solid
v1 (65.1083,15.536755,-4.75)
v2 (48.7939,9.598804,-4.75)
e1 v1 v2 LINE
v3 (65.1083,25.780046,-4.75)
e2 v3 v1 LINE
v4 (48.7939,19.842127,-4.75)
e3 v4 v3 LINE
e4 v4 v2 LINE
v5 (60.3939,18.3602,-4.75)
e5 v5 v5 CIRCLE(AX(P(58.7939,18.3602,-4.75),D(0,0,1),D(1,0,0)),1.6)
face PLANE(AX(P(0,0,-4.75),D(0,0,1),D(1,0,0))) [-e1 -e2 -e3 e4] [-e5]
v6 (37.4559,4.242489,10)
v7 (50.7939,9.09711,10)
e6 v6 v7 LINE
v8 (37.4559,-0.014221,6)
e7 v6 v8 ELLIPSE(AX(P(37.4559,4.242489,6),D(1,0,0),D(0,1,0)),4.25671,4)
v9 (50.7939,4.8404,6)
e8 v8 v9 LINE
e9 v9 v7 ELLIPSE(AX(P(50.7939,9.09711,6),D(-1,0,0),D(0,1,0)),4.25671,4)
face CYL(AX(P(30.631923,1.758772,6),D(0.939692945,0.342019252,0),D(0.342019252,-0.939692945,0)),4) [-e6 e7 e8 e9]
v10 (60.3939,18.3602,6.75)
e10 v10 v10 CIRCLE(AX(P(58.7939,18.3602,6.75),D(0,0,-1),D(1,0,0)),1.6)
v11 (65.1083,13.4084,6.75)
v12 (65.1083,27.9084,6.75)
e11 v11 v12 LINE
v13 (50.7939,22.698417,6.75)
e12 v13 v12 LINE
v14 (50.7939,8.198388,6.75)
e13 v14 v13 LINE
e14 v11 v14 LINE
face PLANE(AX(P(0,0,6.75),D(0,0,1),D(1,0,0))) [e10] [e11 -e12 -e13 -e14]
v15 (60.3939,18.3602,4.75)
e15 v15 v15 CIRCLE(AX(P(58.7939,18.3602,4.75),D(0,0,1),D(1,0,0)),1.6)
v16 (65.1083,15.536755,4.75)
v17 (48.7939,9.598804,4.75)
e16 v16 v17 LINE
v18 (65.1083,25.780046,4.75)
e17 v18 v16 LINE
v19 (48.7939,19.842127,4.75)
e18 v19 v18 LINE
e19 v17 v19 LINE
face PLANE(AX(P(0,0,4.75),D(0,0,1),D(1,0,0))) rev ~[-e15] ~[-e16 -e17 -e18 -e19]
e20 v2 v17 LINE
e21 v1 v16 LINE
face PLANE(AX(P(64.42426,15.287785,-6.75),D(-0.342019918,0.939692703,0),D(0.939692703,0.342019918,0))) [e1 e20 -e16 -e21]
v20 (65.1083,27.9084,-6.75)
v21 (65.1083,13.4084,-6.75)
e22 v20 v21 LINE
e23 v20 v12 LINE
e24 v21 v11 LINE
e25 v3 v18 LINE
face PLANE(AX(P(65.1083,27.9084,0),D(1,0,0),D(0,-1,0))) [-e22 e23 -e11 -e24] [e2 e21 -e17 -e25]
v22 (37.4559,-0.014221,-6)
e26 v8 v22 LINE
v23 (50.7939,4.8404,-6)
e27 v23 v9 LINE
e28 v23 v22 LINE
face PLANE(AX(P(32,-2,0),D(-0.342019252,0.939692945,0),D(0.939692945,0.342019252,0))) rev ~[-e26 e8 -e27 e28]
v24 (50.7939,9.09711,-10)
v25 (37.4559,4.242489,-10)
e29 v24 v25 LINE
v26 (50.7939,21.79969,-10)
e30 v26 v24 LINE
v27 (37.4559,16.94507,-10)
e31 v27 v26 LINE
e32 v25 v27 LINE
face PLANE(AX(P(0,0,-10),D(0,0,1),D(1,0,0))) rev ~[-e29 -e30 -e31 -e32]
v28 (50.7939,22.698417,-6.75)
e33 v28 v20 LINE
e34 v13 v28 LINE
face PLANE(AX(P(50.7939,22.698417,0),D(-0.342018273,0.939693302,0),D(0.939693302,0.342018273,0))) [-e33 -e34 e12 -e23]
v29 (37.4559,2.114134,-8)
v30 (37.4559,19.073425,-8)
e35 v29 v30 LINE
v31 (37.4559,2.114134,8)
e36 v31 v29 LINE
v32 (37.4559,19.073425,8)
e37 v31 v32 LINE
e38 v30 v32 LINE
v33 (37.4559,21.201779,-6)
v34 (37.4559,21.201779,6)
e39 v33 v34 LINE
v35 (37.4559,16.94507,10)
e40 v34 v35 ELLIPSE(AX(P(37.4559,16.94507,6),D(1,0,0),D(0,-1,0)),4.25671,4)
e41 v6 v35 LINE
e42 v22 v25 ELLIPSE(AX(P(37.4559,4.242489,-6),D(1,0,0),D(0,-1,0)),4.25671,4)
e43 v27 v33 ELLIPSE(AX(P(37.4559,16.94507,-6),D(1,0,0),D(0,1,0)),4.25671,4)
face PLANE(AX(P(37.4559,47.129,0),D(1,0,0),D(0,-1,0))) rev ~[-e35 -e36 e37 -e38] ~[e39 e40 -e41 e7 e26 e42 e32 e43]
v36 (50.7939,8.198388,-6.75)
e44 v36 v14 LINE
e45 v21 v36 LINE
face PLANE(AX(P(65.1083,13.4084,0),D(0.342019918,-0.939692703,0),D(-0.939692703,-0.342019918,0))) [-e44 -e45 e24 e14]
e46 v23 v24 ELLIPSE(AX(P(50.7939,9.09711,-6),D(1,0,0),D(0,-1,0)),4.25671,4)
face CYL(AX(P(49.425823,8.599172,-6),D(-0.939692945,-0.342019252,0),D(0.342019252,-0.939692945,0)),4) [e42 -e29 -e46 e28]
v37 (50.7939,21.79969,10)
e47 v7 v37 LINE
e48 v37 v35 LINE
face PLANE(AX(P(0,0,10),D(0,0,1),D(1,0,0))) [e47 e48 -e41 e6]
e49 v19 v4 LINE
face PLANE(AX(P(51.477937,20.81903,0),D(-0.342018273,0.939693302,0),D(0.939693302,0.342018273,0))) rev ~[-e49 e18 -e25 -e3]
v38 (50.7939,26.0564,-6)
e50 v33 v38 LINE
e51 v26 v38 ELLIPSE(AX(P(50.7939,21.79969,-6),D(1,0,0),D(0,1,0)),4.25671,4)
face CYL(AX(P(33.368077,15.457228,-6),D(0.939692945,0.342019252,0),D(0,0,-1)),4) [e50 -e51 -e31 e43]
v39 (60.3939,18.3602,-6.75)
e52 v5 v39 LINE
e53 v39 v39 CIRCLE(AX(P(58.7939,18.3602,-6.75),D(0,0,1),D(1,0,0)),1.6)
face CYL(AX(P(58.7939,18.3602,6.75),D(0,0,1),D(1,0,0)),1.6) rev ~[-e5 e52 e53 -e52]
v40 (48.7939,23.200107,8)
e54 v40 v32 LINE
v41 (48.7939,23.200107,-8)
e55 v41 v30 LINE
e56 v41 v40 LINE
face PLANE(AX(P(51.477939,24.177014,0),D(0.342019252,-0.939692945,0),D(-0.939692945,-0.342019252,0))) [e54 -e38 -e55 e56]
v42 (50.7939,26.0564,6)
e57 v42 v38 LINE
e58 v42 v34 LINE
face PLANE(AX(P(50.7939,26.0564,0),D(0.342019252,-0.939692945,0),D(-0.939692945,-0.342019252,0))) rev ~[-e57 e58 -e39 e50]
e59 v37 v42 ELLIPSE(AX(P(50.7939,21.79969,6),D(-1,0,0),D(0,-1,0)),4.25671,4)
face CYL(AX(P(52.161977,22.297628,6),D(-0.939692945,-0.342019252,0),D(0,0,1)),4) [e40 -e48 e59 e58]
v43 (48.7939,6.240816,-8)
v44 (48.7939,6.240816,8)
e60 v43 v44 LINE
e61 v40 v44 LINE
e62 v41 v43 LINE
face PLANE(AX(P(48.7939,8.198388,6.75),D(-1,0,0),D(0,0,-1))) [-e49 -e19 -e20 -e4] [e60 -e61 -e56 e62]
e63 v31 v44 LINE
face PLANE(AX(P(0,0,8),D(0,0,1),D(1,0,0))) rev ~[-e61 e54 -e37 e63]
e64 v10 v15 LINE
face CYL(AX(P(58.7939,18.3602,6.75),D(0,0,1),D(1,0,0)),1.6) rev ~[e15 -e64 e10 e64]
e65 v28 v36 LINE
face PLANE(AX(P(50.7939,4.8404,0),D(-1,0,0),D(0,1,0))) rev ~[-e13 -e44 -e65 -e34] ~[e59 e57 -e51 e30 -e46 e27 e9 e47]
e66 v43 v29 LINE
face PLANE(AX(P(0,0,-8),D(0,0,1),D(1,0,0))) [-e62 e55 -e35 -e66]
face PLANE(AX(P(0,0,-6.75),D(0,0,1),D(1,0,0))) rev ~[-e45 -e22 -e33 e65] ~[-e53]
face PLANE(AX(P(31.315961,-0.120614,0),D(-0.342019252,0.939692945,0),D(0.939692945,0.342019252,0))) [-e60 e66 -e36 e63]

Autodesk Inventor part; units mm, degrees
ref_plane "YZ Plane" through (0, 0, 0) normal (1, 0, 0) x (0, 1, 0)
ref_plane "XZ Plane" through (0, 0, 0) normal (0, 1, 0) x (-1, 0, 0)
ref_plane "XY Plane" through (0, 0, 0) normal (0, 0, 1) x (1, 0, 0)
sketch "Skizze1" plane through (0, 0, 0) normal (0, 1, 0) x (-1, 0, 0)
  line L0 (20.5, -10.1) -> (-20.5, -10.1)
  line L1 (-20.5, -10.1) -> (-20.5, 10.1)
  line L2 (-20.5, 10.1) -> (20.5, 10.1)
  line L3 (20.5, 10.1) -> (20.5, -10.1)
  line L4 (0, -23.94) -> (0, 23.94) projected
  line L5 (-40.6, 0) -> (40.6, 0) projected
  line L6 (29, -17.1) -> (-29, -17.1)
  line L7 (-29, -17.1) -> (-29, 17.1)
  line L8 (-29, 17.1) -> (29, 17.1)
  line L9 (29, 17.1) -> (29, -17.1)
  point P0 (0, 0)
  dimension "d0" = 41
  dimension "d3" = 20.2
  dimension "d7" = 58
  dimension "d8" = 7
extrude "Extrusion2" add sketch "Skizze1" along normal mid plane 4 contours L3 L5 L9 L6 L4 L0 | L4 L6 L7 L5 L1 L0 | L3 L2 L4 L8 L9 L5 | L5 L7 L8 L4 L2 L1
sketch "Skizze2" plane through (0, 2, 0) normal (0, 1, 0) x (1, 0, 0)
  circle A0 centre (-24, 5) radius 1.6
  circle A1 centre (-24, -5) radius 1.6
  line L0 (-29, 17.1) -> (-29, -17.1) projected
  line L1 (40.6, 0) -> (-40.6, 0) projected
  line L2 (0, 23.94) -> (0, -23.94) projected
  circle A2 centre (24, 5) radius 1.6
  circle A3 centre (24, -5) radius 1.6
  line L3 (-20.5, -10.1) -> (-20.5, 10.1) projected
  point P0 (0, 0)
  dimension "d11" = 3.2
  dimension "d12" = 3.2
  dimension "d15" = 10
  dimension "d16" = 5
  dimension "d58" = 3.5
  dimension "d59" = 3.5
extrude "Extrusion3" cut sketch "Skizze2" against normal up to surface (4 mm away)
sketch "Skizze3" plane through (0, 2, 0) normal (0, 1, 0) x (1, 0, 0)
  line L0 (-20.5, -10.1) -> (-20.5, 10.1) projected
  line L1 (-20.5, -0.75) -> (-27.5, -0.75)
  line L2 (-27.5, -0.75) -> (-27.5, 0.75)
  line L3 (-27.5, 0.75) -> (-20.5, 0.75)
  line L4 (-20.5, 0.75) -> (-20.5, -0.75)
  line L5 (40.6, 0) -> (-40.6, 0) projected
  line L6 (0, 23.94) -> (0, -23.94) projected
  line L7 (20.5, 10.1) -> (20.5, -10.1) projected
  line L8 (20.5, 0.75) -> (27.5, 0.75)
  line L9 (27.5, 0.75) -> (27.5, -0.75)
  line L10 (27.5, -0.75) -> (20.5, -0.75)
  line L11 (20.5, -0.75) -> (20.5, 0.75)
  point P0 (0, 0)
  dimension "d19" = 7
  dimension "d20" = 1.5
  dimension "d23" = 7
extrude "Extrusion4" cut sketch "Skizze3" against normal blind 2 contours L1 L2 L5 L0 | L5 L2 L3 L0
extrude "Extrusion5" cut sketch "Skizze3" against normal blind 2 contours L9 L10 L7 L5 | L5 L7 L8 L9
sketch "Skizze4" plane through (0, 0, 0) normal (0, 0, 1) x (1, 0, 0)
  line L0 (0, 34.5995) -> (0, -8.0999) projected
  line L1 (-12.8217, 0) -> (76.93, 0) projected
  line L2 (29, 2) -> (29, -2) projected
  line L3 (29, -2) -> (32, -2)
  line L4 (32, -2) -> (32, 19.216)
  line L5 (32, 19.216) -> (29, 19.216)
  line L6 (29, 19.216) -> (29, -2)
  line L7 (32, -2) -> (50.7939, 4.8404)
  line L8 (50.7939, 4.8404) -> (50.7939, 26.0564)
  line L9 (50.7939, 26.0564) -> (32, 19.216)
  line L10 (32, 15.858) -> (48.1939, 21.7521)
  line L11 (48.0492, 7.1994) -> (32, 1.358)
  line L12 (48.1939, 21.7521) -> (65.1083, 27.9084)
  line L13 (65.1083, 27.9084) -> (65.1083, 13.4084)
  line L14 (65.1083, 13.4084) -> (48.0492, 7.1994)
  line L15 (50.7939, 15.4484) -> (37.5768, 10.6378)
  line L16 (50.7939, 15.4484) -> (64.8591, 15.4484) construction
  point P0 (0, 0)
  point P1 (50.7939, 22.6984)
  point P2 (50.7939, 8.1984)
  dimension "d26" = 3
  dimension "d27" = 21.216
  dimension "d28" = 20
  dimension "d29" = 21.216
  dimension "d30" = 20
  dimension "d38" = 110
  dimension "d42" = 18
  dimension "d44" = 110
  dimension "d48" = 14.3145
  dimension "d66" = 14.5
  dimension "d67" = 160
extrude "Extrusion6" add sketch "Skizze4" along normal mid plane 34.2 contours L2 L6 L5 L4 L1 | L1 L4 L3 L2
sketch "Skizze6" plane through (0, 0, 0) normal (0, 0, 1) x (1, 0, 0)
  point P0 (0, 0)
extrude "Extrusion7" add sketch "Skizze4" along normal mid plane 20 contours L4 L11 L14 L8 L7 L1 | L1 L7 L4 | L4 L10 L12 L8 L14 L11 | L4 L9 L8 L12 L10
extrude "Extrusion9" add sketch "Skizze4" along normal mid plane 13.5 contours L8 L12 L13 L14
shell "Wandung2" thickness 2 removed faces 1 at (65.1083, 18.2418, -2.25)
fillet "Rundung1" radius 4 4 edges at (41.3969, 22.6362, 10) (41.3969, 22.6362, -10) (41.3969, 1.4202, -10) (41.3969, 1.4202, 10)
sketch "Skizze7" plane through (-29, -2, 17.1) normal (0, 0, 1) x (1, 0, 0)
  line L0 (-12.2, 2) -> (73.2, 2) projected
  line L1 (29, 25.4592) -> (29, -4.2432) projected
  line L2 (58, 4) -> (58, 21.216) projected
  line L3 (58, 21.216) -> (29, 4)
  line L4 (8.5, 4) -> (49.5, 4) projected
  line L5 (58, 4) -> (0, 4) projected
  line L6 (58, 4) -> (58, 21.216)
  point P0 (29, 2)
extrude "Extrusion10" add sketch "Skizze7" against normal blind 2
sketch "Skizze8" plane through (-29, -2, -17.1) normal (0, 0, -1) x (-1, 0, 0)
  line L0 (-29, -4.2432) -> (-29, 25.4592) projected
  line L1 (-73.2, 2) -> (12.2, 2) projected
  line L2 (-58, 4) -> (-58, 21.216) projected
  line L3 (-58, 21.216) -> (-29, 4)
  line L4 (-8.5, 4) -> (-49.5, 4) projected
  line L5 (-58, 4) -> (0, 4) projected
  line L6 (-58, 21.216) -> (-61, 21.216) projected
  line L7 (-58, 4) -> (-58, 21.216)
  point P0 (-29, 2)
extrude "Extrusion11" add sketch "Skizze8" against normal blind 2
sketch "Skizze9" plane through (0, 0, 6.75) normal (0, 0, 1) x (1, 0, 0)
  circle A0 centre (58.7939, 18.3602) radius 1.6
  line L0 (65.1083, 13.4084) -> (65.1083, 27.9084) projected
  line L1 (65.1083, 15.5368) -> (65.1083, 25.7801) projected
  line L2 (65.1083, 20.6584) -> (53.7155, 16.5118)
  line L3 (65.1083, 20.6584) -> (77.2323, 20.6584) construction
  line L4 (50.7939, 8.1984) -> (50.7939, 22.6984) projected
  point P0 (0, 0)
  dimension "d60" = 3.2
  dimension "d62" = 160
  dimension "d63" = 8
extrude "Extrusion12" cut sketch "Skizze9" against normal up to surface (13.5 mm away)
sketch "Skizze10" plane through (0, 0, 0) normal (0, 0, 1) x (1, 0, 0)
  line L0 (-46.9108, 47.129) -> (37.4559, 47.129)
  line L1 (37.4559, 47.129) -> (37.4559, -27.201)
  line L2 (37.4559, -27.201) -> (-46.9108, -27.201)
  line L3 (-46.9108, -27.201) -> (-46.9108, 47.129)
  point P0 (0, 0)
extrude "Extrusion13" cut sketch "Skizze10" along normal mid plane 50
properties part number "_3D-Druck"
